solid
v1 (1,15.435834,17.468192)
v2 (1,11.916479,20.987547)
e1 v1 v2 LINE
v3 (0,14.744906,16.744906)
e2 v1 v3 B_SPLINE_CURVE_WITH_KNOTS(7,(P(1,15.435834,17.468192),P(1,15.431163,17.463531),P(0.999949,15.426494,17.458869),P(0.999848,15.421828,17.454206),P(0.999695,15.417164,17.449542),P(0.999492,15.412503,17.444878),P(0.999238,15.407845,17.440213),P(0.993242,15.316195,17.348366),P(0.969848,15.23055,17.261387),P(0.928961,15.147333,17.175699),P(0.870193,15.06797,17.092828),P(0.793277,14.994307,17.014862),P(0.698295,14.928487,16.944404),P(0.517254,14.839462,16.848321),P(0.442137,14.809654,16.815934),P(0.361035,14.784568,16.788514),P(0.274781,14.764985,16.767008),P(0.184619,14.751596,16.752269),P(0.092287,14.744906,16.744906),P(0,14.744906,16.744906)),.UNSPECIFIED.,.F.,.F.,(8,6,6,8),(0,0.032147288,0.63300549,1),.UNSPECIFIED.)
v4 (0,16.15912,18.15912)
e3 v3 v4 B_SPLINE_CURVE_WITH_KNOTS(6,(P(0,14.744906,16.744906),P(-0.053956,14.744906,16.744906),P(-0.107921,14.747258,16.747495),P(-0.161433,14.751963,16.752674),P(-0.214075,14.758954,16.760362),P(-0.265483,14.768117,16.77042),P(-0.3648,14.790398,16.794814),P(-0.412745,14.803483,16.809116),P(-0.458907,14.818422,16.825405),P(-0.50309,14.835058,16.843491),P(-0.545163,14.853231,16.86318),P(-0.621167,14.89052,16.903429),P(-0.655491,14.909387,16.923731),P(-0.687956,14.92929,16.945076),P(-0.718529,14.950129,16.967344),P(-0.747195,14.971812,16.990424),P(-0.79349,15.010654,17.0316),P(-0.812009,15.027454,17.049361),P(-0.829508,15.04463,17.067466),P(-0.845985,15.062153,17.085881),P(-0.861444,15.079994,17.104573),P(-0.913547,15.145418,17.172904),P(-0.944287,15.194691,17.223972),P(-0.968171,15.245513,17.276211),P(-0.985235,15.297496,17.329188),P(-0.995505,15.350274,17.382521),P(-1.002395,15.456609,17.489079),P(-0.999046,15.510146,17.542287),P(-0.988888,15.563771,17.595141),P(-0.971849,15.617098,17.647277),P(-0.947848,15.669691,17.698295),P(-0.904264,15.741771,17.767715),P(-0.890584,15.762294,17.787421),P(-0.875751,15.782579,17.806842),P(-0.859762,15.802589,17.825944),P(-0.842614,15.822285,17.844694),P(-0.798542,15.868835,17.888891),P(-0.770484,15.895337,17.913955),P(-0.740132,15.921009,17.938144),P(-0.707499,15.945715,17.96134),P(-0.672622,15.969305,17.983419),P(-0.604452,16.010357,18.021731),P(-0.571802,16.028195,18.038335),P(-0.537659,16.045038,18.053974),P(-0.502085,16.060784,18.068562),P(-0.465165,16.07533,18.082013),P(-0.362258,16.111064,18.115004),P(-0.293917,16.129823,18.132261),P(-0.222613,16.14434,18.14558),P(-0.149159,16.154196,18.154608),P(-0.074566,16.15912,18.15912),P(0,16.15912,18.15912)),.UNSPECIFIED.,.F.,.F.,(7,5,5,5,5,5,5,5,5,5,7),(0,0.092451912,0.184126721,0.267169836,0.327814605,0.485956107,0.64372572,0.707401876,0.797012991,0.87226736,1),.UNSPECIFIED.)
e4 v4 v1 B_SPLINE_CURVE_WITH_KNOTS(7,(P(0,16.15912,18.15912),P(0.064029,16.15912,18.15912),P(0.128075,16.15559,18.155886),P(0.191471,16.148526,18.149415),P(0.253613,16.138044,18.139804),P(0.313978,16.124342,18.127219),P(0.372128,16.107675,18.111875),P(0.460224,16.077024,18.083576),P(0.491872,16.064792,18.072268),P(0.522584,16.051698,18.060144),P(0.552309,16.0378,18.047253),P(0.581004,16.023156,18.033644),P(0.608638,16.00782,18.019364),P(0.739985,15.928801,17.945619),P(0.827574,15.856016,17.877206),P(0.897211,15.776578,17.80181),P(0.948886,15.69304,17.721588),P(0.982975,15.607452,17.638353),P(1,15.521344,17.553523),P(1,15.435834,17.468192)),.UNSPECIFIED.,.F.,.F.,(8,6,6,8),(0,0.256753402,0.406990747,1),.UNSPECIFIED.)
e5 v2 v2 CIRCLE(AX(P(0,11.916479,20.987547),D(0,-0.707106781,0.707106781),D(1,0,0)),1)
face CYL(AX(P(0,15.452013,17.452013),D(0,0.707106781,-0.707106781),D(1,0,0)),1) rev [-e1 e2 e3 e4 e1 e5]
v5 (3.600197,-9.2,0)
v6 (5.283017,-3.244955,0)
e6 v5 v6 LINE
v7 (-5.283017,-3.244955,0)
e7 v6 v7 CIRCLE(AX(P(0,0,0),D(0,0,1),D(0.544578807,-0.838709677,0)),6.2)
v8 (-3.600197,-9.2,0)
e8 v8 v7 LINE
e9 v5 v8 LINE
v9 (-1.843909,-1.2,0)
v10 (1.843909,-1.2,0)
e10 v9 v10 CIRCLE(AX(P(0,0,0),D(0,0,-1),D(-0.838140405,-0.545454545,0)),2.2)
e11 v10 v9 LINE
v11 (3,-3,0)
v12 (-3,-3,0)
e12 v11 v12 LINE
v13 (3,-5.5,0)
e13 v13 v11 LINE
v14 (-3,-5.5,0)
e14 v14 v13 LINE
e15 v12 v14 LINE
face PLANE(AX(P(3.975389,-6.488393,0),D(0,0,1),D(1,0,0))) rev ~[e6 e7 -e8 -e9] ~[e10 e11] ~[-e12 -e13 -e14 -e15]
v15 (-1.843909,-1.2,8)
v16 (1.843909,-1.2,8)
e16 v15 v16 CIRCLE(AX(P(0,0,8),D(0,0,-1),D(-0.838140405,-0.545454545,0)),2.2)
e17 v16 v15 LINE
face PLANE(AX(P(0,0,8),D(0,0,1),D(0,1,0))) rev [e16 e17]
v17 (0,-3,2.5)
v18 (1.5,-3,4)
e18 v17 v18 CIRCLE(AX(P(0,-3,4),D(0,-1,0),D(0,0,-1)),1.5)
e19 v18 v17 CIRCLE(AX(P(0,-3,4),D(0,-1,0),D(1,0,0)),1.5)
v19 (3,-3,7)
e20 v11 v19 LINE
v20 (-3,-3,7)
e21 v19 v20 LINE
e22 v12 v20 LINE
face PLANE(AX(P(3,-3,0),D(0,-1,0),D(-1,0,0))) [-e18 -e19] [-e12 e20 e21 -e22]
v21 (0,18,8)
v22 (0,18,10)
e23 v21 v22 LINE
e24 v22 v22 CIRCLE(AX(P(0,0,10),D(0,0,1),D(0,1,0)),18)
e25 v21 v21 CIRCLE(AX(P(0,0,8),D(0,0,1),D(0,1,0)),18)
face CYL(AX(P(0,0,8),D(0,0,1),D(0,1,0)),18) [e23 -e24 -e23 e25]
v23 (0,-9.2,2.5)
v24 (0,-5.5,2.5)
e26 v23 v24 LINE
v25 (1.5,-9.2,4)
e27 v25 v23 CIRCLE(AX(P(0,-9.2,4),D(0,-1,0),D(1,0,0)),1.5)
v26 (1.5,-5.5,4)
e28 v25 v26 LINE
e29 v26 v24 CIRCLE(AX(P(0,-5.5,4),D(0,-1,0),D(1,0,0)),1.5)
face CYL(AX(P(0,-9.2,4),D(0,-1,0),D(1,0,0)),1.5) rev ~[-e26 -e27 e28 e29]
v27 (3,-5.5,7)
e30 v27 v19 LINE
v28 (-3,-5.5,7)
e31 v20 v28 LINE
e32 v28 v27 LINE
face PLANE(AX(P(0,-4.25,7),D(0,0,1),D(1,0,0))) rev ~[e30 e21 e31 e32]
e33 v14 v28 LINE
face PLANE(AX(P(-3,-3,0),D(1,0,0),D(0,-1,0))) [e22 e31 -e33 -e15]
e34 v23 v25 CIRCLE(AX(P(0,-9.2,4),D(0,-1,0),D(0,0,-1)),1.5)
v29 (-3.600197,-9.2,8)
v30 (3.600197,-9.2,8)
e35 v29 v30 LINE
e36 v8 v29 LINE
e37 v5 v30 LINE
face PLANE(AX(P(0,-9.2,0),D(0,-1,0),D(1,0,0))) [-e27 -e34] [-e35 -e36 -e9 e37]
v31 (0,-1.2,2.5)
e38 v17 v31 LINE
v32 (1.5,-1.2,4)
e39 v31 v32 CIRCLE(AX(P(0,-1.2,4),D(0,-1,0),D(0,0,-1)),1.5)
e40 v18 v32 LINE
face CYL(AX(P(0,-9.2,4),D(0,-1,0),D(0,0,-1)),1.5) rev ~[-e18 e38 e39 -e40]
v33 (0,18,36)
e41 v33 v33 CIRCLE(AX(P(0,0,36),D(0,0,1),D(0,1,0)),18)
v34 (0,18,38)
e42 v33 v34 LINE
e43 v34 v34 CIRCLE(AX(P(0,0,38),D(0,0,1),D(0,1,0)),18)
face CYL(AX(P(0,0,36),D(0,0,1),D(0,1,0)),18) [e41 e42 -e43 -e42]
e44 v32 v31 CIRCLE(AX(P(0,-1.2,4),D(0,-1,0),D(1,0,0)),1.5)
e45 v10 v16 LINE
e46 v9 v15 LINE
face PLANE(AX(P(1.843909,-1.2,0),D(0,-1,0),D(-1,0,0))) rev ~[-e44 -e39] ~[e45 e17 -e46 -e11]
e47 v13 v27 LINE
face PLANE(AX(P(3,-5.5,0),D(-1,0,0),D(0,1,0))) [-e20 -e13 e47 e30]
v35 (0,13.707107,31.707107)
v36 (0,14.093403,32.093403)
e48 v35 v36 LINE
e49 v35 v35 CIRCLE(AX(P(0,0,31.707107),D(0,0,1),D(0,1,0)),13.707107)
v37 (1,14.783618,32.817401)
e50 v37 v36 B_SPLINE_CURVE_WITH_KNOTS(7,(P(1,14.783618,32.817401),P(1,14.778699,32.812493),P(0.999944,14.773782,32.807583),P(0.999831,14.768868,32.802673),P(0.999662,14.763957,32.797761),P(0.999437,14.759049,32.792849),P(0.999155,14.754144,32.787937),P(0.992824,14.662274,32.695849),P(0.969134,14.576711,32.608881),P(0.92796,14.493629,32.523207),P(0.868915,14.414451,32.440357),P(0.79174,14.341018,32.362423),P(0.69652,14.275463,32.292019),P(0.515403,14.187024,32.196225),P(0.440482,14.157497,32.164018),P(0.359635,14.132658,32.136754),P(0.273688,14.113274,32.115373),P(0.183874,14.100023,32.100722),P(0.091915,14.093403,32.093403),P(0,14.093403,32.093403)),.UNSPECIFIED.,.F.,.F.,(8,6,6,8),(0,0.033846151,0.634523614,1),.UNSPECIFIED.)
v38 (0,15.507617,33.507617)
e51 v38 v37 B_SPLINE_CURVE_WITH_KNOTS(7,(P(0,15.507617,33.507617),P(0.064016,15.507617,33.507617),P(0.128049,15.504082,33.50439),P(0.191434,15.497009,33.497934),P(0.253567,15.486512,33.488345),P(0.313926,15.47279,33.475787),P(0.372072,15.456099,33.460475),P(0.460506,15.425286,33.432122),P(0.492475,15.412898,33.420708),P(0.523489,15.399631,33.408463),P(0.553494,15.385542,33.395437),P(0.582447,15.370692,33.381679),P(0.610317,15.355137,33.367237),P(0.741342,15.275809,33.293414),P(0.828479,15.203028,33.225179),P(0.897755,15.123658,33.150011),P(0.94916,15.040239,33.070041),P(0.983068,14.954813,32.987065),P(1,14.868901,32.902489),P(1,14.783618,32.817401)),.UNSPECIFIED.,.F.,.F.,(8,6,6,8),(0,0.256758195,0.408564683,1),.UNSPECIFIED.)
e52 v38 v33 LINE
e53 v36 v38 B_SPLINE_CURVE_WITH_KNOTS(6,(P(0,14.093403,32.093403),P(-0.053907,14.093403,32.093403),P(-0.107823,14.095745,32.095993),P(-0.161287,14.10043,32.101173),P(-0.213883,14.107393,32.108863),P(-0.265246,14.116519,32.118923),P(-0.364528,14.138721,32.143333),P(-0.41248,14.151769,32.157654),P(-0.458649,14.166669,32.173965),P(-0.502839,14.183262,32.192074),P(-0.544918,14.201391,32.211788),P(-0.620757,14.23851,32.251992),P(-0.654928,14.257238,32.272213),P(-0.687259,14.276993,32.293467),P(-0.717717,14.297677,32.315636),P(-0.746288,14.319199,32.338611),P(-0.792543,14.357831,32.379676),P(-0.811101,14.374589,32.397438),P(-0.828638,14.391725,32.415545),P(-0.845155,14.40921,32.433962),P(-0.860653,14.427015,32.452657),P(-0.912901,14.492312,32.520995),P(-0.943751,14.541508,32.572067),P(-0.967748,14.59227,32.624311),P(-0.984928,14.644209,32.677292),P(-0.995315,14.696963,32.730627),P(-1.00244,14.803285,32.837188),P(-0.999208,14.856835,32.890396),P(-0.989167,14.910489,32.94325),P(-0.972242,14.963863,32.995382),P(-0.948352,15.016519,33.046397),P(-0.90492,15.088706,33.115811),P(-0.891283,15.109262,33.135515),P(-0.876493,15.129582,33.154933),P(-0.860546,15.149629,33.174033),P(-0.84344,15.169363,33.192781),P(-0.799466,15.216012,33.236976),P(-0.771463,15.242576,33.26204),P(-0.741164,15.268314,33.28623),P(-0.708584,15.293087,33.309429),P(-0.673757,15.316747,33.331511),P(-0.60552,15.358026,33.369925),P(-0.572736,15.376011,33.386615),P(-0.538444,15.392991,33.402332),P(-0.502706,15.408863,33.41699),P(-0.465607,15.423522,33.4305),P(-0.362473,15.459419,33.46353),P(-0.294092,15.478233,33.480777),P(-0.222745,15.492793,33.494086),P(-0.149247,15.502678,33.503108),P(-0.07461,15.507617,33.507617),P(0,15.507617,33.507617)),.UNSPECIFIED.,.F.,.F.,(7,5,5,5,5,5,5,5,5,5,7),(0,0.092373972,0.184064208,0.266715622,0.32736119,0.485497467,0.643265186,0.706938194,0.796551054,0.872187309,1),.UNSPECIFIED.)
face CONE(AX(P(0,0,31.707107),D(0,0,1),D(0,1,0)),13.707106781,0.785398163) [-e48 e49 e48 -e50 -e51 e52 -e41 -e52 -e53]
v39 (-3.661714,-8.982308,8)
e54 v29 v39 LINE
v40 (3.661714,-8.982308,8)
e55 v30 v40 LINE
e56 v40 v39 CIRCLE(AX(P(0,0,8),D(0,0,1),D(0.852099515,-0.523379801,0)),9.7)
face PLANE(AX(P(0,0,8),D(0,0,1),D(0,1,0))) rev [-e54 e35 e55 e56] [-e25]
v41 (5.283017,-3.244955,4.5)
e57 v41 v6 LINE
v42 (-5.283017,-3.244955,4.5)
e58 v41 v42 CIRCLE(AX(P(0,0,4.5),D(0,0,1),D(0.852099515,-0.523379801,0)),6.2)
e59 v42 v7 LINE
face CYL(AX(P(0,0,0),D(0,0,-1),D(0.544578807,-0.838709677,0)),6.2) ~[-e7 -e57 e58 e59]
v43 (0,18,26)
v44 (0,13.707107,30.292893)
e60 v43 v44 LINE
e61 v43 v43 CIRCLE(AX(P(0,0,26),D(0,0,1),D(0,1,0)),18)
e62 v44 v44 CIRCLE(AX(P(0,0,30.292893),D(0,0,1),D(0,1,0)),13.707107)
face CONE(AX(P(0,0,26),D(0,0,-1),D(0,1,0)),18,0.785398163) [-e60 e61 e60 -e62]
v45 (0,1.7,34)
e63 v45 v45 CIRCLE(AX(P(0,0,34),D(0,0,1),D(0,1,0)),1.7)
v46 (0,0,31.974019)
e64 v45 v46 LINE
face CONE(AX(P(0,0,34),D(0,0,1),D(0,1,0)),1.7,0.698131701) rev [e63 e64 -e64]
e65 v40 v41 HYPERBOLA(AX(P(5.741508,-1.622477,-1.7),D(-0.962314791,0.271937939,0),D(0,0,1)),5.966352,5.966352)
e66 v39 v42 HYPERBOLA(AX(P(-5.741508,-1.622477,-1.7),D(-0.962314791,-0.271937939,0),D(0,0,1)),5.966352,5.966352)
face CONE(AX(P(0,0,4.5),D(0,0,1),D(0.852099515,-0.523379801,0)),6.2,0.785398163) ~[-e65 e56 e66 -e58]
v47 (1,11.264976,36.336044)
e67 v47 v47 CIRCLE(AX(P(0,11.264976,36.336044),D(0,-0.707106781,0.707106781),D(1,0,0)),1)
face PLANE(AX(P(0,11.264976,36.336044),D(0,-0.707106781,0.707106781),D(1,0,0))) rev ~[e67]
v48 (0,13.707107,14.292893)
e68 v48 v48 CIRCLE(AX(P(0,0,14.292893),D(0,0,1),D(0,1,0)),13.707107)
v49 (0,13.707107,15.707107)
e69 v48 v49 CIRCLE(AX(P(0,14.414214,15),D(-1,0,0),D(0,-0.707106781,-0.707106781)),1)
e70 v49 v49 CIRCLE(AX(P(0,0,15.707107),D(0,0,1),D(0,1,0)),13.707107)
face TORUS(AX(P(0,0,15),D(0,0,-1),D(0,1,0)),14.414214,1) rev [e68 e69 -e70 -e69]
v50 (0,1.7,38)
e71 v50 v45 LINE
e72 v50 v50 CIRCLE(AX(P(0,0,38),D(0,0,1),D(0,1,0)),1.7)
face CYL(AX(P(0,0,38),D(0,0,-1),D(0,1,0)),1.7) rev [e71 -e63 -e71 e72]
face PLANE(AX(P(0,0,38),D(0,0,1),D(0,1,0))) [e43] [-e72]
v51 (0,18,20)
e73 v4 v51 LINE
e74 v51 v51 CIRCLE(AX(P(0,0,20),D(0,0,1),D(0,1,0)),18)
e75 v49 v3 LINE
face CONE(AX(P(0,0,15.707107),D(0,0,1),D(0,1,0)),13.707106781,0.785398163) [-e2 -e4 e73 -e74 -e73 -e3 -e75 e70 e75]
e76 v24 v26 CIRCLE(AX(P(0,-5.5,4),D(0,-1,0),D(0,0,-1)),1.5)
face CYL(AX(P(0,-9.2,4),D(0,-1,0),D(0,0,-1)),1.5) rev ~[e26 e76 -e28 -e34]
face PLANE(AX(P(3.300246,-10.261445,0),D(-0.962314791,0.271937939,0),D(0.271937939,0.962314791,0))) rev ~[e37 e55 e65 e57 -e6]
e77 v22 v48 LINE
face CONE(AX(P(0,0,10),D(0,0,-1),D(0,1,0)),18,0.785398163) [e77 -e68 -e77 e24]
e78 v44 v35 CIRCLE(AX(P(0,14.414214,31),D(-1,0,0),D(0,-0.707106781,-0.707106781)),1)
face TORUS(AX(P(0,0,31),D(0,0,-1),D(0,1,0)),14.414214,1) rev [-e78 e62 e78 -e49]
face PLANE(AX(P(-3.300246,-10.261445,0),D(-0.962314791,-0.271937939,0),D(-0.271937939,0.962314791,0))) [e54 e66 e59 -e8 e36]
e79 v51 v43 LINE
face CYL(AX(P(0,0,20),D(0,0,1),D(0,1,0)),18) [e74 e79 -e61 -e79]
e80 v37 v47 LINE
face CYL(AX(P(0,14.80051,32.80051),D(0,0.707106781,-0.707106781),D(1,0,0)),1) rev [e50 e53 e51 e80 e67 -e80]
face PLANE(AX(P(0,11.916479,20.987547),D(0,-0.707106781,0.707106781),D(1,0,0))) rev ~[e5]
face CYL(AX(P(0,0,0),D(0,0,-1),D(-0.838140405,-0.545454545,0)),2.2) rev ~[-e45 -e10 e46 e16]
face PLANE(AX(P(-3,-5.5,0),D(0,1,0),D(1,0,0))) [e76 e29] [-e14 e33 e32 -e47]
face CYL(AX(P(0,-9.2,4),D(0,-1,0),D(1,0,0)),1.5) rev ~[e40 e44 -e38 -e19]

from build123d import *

# Parameters (mm, degrees)
F1_DEPTH     = 8
F3_W         = 6.7527772065
F3_H         = 8
F4_DEPTH     = 4
F8_DEPTH     = 7
F9_T4_DEPTH  = 8
F9_T9_DEPTH  = 20.6550440955
F9_T15_DEPTH = 20.6550440955
F9_T21_DEPTH = 8
F9_T26_DEPTH = 20.6550440955
F9_T32_DEPTH = 20.6550440955
F12_DEPTH    = 8
F13_SIZE     = 3.5
F16_R        = 1
F17_DEPTH    = 5
F20_R        = 1
F21_DEPTH    = 5


# Not quite as in the source:
# - a fillet or chamfer that OpenCascade refuses, or shapes differently, is made with other operations: its cross-section is extruded or revolved along the edge and cut away or added


with BuildPart() as f1:
    # F0 (on Top) → F1 (new body)
    with BuildSketch(Plane.XY):
        with BuildLine():
            Line((-3.3763886032, -5.2), (3.3763886032, -5.2))
            ThreePointArc((3.3763886032, -5.2), (0, 6.2), (-3.3763886032, -5.2))
        make_face()
        with BuildLine():
            ThreePointArc((-1.8439088915, -1.2), (0, 2.2), (1.8439088915, -1.2))
            Line((1.8439088915, -1.2), (-1.8439088915, -1.2))
        make_face(mode=Mode.SUBTRACT)
    extrude(amount=F1_DEPTH)

    # F3 (on offset) → F4 (join)
    with BuildSketch(Plane.XZ.offset(5.2)):
        with Locations((0, 4)):
            Rectangle(F3_W, F3_H)
    extrude(amount=F4_DEPTH)

    # F6 (on Right) → F7 (revolve)
    with BuildSketch(Plane.YZ):
        with BuildLine():
            Line((18, 36), (18, 38))
            Line((18, 38), (1.7, 38))
            Line((1.7, 38), (1.7, 34))
            Line((1.7, 34), (0, 31.9740188926))
            Line((0, 31.9740188926), (0, 8))
            Line((0, 8), (18, 8))
            Line((18, 8), (18, 10))
            Line((18, 10), (13.7071067812, 14.2928932188))
            ThreePointArc((13.7071067812, 14.2928932188), (13.4142135624, 15), (13.7071067812, 15.7071067812))
            Line((13.7071067812, 15.7071067812), (18, 20))
            Line((18, 20), (18, 26))
            Line((18, 26), (13.7071067812, 30.2928932188))
            ThreePointArc((13.7071067812, 30.2928932188), (13.4142135624, 31), (13.7071067812, 31.7071067812))
            Line((13.7071067812, 31.7071067812), (18, 36))
        make_face()
    revolve(axis=Axis((0, 0, 19.9870094463), (0, 0, 1)))

    # F5 (on Top) → F8 (cut)
    with BuildSketch(Plane.XY):
        Polygon((3, -5.5), (3, -3), (0, -3), (-3, -3), (-3, -5.5), align=None)
    extrude(amount=F8_DEPTH, mode=Mode.SUBTRACT)

    # F9: chamfer of 7 on 2 edges, made by hand


with BuildPart() as f9_tool2:
    # F9_s3 → F9_t4 (new body)
    with BuildSketch(Plane.XY):
        with BuildLine():
            Line((-3.3002459804, -10.261444939), (-5.3591596162, -2.9755066267))
            Line((-5.3591596162, -2.9755066267), (-5.2398656841, -2.9022334545))
            ThreePointArc((-5.2398656841, -2.9022334545), (-4.424549602, -4.1408888924), (-3.3001475703, -5.0825806452))
            Line((-3.3001475703, -5.0825806452), (-3.2363886032, -5.2))
            ThreePointArc((-3.2363886032, -5.2), (-3.2363886032, -7.7307224695), (-3.1602459804, -10.261444939))
            Line((-3.1602459804, -10.261444939), (-3.3002459804, -10.261444939))
        make_face()
    extrude(amount=F9_T4_DEPTH)

    split(bisect_by=Plane.XZ.offset(9.2), keep=Keep.BOTTOM)


with BuildPart() as f1_1:
    add(f1.part)

    # F9_t1: union F9_tool2
    add(f9_tool2.part)


with BuildPart() as f9_tool7:
    # F9_s8 → F9_t9 (new body)
    with BuildSketch(Plane.XY):
        with BuildLine():
            Line((-3.3002459804, -10.261444939), (-5.3591596162, -2.9755066267))
            Line((-5.3591596162, -2.9755066267), (-5.2398656841, -2.9022334545))
            ThreePointArc((-5.2398656841, -2.9022334545), (-4.424549602, -4.1408888924), (-3.3001475703, -5.0825806452))
            Line((-3.3001475703, -5.0825806452), (-3.2363886032, -5.2))
            ThreePointArc((-3.2363886032, -5.2), (-3.2363886032, -7.7307224695), (-3.1602459804, -10.261444939))
            Line((-3.1602459804, -10.261444939), (-3.3002459804, -10.261444939))
        make_face()
    extrude(amount=F9_T9_DEPTH)

    split(bisect_by=Plane.XY.offset(8), keep=Keep.TOP)

    split(bisect_by=Plane.XZ.offset(9.2), keep=Keep.TOP)


with BuildPart() as f1_2:
    add(f1_1.part)

    # F9_t6: union F9_tool7
    add(f9_tool7.part)


with BuildPart() as f9_tool13:
    # F9_s14 → F9_t15 (new body)
    with BuildSketch(Plane.XY):
        with BuildLine():
            Line((-3.3002459804, -10.261444939), (-5.3591596162, -2.9755066267))
            Line((-5.3591596162, -2.9755066267), (-5.2398656841, -2.9022334545))
            ThreePointArc((-5.2398656841, -2.9022334545), (-4.424549602, -4.1408888924), (-3.3001475703, -5.0825806452))
            Line((-3.3001475703, -5.0825806452), (-3.2363886032, -5.2))
            ThreePointArc((-3.2363886032, -5.2), (-3.2363886032, -7.7307224695), (-3.1602459804, -10.261444939))
            Line((-3.1602459804, -10.261444939), (-3.3002459804, -10.261444939))
        make_face()
    extrude(amount=F9_T15_DEPTH)

    split(bisect_by=Plane.XY.offset(8), keep=Keep.TOP)

    split(bisect_by=Plane.XZ.offset(9.2), keep=Keep.BOTTOM)


with BuildPart() as f1_3:
    add(f1_2.part)

    # F9_t12: union F9_tool13
    add(f9_tool13.part)


with BuildPart() as f9_tool19:
    # F9_s20 → F9_t21 (new body)
    with BuildSketch(Plane.XY):
        with BuildLine():
            Line((3.3002459804, -10.261444939), (5.3591596162, -2.9755066267))
            Line((5.3591596162, -2.9755066267), (5.2398656841, -2.9022334545))
            ThreePointArc((5.2398656841, -2.9022334545), (4.424549602, -4.1408888924), (3.3001475703, -5.0825806452))
            Line((3.3001475703, -5.0825806452), (3.2363886032, -5.2))
            ThreePointArc((3.2363886032, -5.2), (3.2363886032, -7.7307224695), (3.1602459804, -10.261444939))
            Line((3.1602459804, -10.261444939), (3.3002459804, -10.261444939))
        make_face()
    extrude(amount=F9_T21_DEPTH)

    split(bisect_by=Plane.XZ.offset(9.2), keep=Keep.BOTTOM)


with BuildPart() as f1_4:
    add(f1_3.part)

    # F9_t18: union F9_tool19
    add(f9_tool19.part)


with BuildPart() as f9_tool24:
    # F9_s25 → F9_t26 (new body)
    with BuildSketch(Plane.XY):
        with BuildLine():
            Line((3.3002459804, -10.261444939), (5.3591596162, -2.9755066267))
            Line((5.3591596162, -2.9755066267), (5.2398656841, -2.9022334545))
            ThreePointArc((5.2398656841, -2.9022334545), (4.424549602, -4.1408888924), (3.3001475703, -5.0825806452))
            Line((3.3001475703, -5.0825806452), (3.2363886032, -5.2))
            ThreePointArc((3.2363886032, -5.2), (3.2363886032, -7.7307224695), (3.1602459804, -10.261444939))
            Line((3.1602459804, -10.261444939), (3.3002459804, -10.261444939))
        make_face()
    extrude(amount=F9_T26_DEPTH)

    split(bisect_by=Plane.XY.offset(8), keep=Keep.TOP)

    split(bisect_by=Plane.XZ.offset(9.2), keep=Keep.TOP)


with BuildPart() as f1_5:
    add(f1_4.part)

    # F9_t23: union F9_tool24
    add(f9_tool24.part)


with BuildPart() as f9_tool30:
    # F9_s31 → F9_t32 (new body)
    with BuildSketch(Plane.XY):
        with BuildLine():
            Line((3.3002459804, -10.261444939), (5.3591596162, -2.9755066267))
            Line((5.3591596162, -2.9755066267), (5.2398656841, -2.9022334545))
            ThreePointArc((5.2398656841, -2.9022334545), (4.424549602, -4.1408888924), (3.3001475703, -5.0825806452))
            Line((3.3001475703, -5.0825806452), (3.2363886032, -5.2))
            ThreePointArc((3.2363886032, -5.2), (3.2363886032, -7.7307224695), (3.1602459804, -10.261444939))
            Line((3.1602459804, -10.261444939), (3.3002459804, -10.261444939))
        make_face()
    extrude(amount=F9_T32_DEPTH)

    split(bisect_by=Plane.XY.offset(8), keep=Keep.TOP)

    split(bisect_by=Plane.XZ.offset(9.2), keep=Keep.BOTTOM)


with BuildPart() as f1_6:
    add(f1_5.part)

    # F9_t29: union F9_tool30
    add(f9_tool30.part)

    # F11 (on offset) → F12 (cut, through all)
    with BuildSketch(Plane.XZ.offset(9.2)):
        with BuildLine():
            ThreePointArc((0, 2.5), (1.0606601718, 2.9393398282), (1.5, 4))
            ThreePointArc((1.5, 4), (-1.0606601718, 5.0606601718), (0, 2.5))
        make_face()
    extrude(amount=-F12_DEPTH, mode=Mode.SUBTRACT)

    # F13
    f13_edges = [f1_6.edges().sort_by_distance(p)[0] for p in [
        (0, 6.2, 8),
    ]]
    chamfer(f13_edges, length=F13_SIZE)

    # F16 (on face) → F17 (cut)
    with BuildSketch(Plane(origin=(0, -1, 1), x_dir=(1, 0, 0), z_dir=(0, -0.7071067812, 0.7071067812))):
        with Locations((0, 23.2666600496)):
            Circle(F16_R)
    extrude(amount=F17_DEPTH, mode=Mode.SUBTRACT)

    # F20 (on face) → F21 (cut)
    with BuildSketch(Plane(origin=(0, -9, 9), x_dir=(1, 0, 0), z_dir=(0, -0.7071067812, 0.7071067812))):
        with Locations((0, 33.659003675)):
            Circle(F20_R)
    extrude(amount=F21_DEPTH, mode=Mode.SUBTRACT)


solid = f1_6.part
